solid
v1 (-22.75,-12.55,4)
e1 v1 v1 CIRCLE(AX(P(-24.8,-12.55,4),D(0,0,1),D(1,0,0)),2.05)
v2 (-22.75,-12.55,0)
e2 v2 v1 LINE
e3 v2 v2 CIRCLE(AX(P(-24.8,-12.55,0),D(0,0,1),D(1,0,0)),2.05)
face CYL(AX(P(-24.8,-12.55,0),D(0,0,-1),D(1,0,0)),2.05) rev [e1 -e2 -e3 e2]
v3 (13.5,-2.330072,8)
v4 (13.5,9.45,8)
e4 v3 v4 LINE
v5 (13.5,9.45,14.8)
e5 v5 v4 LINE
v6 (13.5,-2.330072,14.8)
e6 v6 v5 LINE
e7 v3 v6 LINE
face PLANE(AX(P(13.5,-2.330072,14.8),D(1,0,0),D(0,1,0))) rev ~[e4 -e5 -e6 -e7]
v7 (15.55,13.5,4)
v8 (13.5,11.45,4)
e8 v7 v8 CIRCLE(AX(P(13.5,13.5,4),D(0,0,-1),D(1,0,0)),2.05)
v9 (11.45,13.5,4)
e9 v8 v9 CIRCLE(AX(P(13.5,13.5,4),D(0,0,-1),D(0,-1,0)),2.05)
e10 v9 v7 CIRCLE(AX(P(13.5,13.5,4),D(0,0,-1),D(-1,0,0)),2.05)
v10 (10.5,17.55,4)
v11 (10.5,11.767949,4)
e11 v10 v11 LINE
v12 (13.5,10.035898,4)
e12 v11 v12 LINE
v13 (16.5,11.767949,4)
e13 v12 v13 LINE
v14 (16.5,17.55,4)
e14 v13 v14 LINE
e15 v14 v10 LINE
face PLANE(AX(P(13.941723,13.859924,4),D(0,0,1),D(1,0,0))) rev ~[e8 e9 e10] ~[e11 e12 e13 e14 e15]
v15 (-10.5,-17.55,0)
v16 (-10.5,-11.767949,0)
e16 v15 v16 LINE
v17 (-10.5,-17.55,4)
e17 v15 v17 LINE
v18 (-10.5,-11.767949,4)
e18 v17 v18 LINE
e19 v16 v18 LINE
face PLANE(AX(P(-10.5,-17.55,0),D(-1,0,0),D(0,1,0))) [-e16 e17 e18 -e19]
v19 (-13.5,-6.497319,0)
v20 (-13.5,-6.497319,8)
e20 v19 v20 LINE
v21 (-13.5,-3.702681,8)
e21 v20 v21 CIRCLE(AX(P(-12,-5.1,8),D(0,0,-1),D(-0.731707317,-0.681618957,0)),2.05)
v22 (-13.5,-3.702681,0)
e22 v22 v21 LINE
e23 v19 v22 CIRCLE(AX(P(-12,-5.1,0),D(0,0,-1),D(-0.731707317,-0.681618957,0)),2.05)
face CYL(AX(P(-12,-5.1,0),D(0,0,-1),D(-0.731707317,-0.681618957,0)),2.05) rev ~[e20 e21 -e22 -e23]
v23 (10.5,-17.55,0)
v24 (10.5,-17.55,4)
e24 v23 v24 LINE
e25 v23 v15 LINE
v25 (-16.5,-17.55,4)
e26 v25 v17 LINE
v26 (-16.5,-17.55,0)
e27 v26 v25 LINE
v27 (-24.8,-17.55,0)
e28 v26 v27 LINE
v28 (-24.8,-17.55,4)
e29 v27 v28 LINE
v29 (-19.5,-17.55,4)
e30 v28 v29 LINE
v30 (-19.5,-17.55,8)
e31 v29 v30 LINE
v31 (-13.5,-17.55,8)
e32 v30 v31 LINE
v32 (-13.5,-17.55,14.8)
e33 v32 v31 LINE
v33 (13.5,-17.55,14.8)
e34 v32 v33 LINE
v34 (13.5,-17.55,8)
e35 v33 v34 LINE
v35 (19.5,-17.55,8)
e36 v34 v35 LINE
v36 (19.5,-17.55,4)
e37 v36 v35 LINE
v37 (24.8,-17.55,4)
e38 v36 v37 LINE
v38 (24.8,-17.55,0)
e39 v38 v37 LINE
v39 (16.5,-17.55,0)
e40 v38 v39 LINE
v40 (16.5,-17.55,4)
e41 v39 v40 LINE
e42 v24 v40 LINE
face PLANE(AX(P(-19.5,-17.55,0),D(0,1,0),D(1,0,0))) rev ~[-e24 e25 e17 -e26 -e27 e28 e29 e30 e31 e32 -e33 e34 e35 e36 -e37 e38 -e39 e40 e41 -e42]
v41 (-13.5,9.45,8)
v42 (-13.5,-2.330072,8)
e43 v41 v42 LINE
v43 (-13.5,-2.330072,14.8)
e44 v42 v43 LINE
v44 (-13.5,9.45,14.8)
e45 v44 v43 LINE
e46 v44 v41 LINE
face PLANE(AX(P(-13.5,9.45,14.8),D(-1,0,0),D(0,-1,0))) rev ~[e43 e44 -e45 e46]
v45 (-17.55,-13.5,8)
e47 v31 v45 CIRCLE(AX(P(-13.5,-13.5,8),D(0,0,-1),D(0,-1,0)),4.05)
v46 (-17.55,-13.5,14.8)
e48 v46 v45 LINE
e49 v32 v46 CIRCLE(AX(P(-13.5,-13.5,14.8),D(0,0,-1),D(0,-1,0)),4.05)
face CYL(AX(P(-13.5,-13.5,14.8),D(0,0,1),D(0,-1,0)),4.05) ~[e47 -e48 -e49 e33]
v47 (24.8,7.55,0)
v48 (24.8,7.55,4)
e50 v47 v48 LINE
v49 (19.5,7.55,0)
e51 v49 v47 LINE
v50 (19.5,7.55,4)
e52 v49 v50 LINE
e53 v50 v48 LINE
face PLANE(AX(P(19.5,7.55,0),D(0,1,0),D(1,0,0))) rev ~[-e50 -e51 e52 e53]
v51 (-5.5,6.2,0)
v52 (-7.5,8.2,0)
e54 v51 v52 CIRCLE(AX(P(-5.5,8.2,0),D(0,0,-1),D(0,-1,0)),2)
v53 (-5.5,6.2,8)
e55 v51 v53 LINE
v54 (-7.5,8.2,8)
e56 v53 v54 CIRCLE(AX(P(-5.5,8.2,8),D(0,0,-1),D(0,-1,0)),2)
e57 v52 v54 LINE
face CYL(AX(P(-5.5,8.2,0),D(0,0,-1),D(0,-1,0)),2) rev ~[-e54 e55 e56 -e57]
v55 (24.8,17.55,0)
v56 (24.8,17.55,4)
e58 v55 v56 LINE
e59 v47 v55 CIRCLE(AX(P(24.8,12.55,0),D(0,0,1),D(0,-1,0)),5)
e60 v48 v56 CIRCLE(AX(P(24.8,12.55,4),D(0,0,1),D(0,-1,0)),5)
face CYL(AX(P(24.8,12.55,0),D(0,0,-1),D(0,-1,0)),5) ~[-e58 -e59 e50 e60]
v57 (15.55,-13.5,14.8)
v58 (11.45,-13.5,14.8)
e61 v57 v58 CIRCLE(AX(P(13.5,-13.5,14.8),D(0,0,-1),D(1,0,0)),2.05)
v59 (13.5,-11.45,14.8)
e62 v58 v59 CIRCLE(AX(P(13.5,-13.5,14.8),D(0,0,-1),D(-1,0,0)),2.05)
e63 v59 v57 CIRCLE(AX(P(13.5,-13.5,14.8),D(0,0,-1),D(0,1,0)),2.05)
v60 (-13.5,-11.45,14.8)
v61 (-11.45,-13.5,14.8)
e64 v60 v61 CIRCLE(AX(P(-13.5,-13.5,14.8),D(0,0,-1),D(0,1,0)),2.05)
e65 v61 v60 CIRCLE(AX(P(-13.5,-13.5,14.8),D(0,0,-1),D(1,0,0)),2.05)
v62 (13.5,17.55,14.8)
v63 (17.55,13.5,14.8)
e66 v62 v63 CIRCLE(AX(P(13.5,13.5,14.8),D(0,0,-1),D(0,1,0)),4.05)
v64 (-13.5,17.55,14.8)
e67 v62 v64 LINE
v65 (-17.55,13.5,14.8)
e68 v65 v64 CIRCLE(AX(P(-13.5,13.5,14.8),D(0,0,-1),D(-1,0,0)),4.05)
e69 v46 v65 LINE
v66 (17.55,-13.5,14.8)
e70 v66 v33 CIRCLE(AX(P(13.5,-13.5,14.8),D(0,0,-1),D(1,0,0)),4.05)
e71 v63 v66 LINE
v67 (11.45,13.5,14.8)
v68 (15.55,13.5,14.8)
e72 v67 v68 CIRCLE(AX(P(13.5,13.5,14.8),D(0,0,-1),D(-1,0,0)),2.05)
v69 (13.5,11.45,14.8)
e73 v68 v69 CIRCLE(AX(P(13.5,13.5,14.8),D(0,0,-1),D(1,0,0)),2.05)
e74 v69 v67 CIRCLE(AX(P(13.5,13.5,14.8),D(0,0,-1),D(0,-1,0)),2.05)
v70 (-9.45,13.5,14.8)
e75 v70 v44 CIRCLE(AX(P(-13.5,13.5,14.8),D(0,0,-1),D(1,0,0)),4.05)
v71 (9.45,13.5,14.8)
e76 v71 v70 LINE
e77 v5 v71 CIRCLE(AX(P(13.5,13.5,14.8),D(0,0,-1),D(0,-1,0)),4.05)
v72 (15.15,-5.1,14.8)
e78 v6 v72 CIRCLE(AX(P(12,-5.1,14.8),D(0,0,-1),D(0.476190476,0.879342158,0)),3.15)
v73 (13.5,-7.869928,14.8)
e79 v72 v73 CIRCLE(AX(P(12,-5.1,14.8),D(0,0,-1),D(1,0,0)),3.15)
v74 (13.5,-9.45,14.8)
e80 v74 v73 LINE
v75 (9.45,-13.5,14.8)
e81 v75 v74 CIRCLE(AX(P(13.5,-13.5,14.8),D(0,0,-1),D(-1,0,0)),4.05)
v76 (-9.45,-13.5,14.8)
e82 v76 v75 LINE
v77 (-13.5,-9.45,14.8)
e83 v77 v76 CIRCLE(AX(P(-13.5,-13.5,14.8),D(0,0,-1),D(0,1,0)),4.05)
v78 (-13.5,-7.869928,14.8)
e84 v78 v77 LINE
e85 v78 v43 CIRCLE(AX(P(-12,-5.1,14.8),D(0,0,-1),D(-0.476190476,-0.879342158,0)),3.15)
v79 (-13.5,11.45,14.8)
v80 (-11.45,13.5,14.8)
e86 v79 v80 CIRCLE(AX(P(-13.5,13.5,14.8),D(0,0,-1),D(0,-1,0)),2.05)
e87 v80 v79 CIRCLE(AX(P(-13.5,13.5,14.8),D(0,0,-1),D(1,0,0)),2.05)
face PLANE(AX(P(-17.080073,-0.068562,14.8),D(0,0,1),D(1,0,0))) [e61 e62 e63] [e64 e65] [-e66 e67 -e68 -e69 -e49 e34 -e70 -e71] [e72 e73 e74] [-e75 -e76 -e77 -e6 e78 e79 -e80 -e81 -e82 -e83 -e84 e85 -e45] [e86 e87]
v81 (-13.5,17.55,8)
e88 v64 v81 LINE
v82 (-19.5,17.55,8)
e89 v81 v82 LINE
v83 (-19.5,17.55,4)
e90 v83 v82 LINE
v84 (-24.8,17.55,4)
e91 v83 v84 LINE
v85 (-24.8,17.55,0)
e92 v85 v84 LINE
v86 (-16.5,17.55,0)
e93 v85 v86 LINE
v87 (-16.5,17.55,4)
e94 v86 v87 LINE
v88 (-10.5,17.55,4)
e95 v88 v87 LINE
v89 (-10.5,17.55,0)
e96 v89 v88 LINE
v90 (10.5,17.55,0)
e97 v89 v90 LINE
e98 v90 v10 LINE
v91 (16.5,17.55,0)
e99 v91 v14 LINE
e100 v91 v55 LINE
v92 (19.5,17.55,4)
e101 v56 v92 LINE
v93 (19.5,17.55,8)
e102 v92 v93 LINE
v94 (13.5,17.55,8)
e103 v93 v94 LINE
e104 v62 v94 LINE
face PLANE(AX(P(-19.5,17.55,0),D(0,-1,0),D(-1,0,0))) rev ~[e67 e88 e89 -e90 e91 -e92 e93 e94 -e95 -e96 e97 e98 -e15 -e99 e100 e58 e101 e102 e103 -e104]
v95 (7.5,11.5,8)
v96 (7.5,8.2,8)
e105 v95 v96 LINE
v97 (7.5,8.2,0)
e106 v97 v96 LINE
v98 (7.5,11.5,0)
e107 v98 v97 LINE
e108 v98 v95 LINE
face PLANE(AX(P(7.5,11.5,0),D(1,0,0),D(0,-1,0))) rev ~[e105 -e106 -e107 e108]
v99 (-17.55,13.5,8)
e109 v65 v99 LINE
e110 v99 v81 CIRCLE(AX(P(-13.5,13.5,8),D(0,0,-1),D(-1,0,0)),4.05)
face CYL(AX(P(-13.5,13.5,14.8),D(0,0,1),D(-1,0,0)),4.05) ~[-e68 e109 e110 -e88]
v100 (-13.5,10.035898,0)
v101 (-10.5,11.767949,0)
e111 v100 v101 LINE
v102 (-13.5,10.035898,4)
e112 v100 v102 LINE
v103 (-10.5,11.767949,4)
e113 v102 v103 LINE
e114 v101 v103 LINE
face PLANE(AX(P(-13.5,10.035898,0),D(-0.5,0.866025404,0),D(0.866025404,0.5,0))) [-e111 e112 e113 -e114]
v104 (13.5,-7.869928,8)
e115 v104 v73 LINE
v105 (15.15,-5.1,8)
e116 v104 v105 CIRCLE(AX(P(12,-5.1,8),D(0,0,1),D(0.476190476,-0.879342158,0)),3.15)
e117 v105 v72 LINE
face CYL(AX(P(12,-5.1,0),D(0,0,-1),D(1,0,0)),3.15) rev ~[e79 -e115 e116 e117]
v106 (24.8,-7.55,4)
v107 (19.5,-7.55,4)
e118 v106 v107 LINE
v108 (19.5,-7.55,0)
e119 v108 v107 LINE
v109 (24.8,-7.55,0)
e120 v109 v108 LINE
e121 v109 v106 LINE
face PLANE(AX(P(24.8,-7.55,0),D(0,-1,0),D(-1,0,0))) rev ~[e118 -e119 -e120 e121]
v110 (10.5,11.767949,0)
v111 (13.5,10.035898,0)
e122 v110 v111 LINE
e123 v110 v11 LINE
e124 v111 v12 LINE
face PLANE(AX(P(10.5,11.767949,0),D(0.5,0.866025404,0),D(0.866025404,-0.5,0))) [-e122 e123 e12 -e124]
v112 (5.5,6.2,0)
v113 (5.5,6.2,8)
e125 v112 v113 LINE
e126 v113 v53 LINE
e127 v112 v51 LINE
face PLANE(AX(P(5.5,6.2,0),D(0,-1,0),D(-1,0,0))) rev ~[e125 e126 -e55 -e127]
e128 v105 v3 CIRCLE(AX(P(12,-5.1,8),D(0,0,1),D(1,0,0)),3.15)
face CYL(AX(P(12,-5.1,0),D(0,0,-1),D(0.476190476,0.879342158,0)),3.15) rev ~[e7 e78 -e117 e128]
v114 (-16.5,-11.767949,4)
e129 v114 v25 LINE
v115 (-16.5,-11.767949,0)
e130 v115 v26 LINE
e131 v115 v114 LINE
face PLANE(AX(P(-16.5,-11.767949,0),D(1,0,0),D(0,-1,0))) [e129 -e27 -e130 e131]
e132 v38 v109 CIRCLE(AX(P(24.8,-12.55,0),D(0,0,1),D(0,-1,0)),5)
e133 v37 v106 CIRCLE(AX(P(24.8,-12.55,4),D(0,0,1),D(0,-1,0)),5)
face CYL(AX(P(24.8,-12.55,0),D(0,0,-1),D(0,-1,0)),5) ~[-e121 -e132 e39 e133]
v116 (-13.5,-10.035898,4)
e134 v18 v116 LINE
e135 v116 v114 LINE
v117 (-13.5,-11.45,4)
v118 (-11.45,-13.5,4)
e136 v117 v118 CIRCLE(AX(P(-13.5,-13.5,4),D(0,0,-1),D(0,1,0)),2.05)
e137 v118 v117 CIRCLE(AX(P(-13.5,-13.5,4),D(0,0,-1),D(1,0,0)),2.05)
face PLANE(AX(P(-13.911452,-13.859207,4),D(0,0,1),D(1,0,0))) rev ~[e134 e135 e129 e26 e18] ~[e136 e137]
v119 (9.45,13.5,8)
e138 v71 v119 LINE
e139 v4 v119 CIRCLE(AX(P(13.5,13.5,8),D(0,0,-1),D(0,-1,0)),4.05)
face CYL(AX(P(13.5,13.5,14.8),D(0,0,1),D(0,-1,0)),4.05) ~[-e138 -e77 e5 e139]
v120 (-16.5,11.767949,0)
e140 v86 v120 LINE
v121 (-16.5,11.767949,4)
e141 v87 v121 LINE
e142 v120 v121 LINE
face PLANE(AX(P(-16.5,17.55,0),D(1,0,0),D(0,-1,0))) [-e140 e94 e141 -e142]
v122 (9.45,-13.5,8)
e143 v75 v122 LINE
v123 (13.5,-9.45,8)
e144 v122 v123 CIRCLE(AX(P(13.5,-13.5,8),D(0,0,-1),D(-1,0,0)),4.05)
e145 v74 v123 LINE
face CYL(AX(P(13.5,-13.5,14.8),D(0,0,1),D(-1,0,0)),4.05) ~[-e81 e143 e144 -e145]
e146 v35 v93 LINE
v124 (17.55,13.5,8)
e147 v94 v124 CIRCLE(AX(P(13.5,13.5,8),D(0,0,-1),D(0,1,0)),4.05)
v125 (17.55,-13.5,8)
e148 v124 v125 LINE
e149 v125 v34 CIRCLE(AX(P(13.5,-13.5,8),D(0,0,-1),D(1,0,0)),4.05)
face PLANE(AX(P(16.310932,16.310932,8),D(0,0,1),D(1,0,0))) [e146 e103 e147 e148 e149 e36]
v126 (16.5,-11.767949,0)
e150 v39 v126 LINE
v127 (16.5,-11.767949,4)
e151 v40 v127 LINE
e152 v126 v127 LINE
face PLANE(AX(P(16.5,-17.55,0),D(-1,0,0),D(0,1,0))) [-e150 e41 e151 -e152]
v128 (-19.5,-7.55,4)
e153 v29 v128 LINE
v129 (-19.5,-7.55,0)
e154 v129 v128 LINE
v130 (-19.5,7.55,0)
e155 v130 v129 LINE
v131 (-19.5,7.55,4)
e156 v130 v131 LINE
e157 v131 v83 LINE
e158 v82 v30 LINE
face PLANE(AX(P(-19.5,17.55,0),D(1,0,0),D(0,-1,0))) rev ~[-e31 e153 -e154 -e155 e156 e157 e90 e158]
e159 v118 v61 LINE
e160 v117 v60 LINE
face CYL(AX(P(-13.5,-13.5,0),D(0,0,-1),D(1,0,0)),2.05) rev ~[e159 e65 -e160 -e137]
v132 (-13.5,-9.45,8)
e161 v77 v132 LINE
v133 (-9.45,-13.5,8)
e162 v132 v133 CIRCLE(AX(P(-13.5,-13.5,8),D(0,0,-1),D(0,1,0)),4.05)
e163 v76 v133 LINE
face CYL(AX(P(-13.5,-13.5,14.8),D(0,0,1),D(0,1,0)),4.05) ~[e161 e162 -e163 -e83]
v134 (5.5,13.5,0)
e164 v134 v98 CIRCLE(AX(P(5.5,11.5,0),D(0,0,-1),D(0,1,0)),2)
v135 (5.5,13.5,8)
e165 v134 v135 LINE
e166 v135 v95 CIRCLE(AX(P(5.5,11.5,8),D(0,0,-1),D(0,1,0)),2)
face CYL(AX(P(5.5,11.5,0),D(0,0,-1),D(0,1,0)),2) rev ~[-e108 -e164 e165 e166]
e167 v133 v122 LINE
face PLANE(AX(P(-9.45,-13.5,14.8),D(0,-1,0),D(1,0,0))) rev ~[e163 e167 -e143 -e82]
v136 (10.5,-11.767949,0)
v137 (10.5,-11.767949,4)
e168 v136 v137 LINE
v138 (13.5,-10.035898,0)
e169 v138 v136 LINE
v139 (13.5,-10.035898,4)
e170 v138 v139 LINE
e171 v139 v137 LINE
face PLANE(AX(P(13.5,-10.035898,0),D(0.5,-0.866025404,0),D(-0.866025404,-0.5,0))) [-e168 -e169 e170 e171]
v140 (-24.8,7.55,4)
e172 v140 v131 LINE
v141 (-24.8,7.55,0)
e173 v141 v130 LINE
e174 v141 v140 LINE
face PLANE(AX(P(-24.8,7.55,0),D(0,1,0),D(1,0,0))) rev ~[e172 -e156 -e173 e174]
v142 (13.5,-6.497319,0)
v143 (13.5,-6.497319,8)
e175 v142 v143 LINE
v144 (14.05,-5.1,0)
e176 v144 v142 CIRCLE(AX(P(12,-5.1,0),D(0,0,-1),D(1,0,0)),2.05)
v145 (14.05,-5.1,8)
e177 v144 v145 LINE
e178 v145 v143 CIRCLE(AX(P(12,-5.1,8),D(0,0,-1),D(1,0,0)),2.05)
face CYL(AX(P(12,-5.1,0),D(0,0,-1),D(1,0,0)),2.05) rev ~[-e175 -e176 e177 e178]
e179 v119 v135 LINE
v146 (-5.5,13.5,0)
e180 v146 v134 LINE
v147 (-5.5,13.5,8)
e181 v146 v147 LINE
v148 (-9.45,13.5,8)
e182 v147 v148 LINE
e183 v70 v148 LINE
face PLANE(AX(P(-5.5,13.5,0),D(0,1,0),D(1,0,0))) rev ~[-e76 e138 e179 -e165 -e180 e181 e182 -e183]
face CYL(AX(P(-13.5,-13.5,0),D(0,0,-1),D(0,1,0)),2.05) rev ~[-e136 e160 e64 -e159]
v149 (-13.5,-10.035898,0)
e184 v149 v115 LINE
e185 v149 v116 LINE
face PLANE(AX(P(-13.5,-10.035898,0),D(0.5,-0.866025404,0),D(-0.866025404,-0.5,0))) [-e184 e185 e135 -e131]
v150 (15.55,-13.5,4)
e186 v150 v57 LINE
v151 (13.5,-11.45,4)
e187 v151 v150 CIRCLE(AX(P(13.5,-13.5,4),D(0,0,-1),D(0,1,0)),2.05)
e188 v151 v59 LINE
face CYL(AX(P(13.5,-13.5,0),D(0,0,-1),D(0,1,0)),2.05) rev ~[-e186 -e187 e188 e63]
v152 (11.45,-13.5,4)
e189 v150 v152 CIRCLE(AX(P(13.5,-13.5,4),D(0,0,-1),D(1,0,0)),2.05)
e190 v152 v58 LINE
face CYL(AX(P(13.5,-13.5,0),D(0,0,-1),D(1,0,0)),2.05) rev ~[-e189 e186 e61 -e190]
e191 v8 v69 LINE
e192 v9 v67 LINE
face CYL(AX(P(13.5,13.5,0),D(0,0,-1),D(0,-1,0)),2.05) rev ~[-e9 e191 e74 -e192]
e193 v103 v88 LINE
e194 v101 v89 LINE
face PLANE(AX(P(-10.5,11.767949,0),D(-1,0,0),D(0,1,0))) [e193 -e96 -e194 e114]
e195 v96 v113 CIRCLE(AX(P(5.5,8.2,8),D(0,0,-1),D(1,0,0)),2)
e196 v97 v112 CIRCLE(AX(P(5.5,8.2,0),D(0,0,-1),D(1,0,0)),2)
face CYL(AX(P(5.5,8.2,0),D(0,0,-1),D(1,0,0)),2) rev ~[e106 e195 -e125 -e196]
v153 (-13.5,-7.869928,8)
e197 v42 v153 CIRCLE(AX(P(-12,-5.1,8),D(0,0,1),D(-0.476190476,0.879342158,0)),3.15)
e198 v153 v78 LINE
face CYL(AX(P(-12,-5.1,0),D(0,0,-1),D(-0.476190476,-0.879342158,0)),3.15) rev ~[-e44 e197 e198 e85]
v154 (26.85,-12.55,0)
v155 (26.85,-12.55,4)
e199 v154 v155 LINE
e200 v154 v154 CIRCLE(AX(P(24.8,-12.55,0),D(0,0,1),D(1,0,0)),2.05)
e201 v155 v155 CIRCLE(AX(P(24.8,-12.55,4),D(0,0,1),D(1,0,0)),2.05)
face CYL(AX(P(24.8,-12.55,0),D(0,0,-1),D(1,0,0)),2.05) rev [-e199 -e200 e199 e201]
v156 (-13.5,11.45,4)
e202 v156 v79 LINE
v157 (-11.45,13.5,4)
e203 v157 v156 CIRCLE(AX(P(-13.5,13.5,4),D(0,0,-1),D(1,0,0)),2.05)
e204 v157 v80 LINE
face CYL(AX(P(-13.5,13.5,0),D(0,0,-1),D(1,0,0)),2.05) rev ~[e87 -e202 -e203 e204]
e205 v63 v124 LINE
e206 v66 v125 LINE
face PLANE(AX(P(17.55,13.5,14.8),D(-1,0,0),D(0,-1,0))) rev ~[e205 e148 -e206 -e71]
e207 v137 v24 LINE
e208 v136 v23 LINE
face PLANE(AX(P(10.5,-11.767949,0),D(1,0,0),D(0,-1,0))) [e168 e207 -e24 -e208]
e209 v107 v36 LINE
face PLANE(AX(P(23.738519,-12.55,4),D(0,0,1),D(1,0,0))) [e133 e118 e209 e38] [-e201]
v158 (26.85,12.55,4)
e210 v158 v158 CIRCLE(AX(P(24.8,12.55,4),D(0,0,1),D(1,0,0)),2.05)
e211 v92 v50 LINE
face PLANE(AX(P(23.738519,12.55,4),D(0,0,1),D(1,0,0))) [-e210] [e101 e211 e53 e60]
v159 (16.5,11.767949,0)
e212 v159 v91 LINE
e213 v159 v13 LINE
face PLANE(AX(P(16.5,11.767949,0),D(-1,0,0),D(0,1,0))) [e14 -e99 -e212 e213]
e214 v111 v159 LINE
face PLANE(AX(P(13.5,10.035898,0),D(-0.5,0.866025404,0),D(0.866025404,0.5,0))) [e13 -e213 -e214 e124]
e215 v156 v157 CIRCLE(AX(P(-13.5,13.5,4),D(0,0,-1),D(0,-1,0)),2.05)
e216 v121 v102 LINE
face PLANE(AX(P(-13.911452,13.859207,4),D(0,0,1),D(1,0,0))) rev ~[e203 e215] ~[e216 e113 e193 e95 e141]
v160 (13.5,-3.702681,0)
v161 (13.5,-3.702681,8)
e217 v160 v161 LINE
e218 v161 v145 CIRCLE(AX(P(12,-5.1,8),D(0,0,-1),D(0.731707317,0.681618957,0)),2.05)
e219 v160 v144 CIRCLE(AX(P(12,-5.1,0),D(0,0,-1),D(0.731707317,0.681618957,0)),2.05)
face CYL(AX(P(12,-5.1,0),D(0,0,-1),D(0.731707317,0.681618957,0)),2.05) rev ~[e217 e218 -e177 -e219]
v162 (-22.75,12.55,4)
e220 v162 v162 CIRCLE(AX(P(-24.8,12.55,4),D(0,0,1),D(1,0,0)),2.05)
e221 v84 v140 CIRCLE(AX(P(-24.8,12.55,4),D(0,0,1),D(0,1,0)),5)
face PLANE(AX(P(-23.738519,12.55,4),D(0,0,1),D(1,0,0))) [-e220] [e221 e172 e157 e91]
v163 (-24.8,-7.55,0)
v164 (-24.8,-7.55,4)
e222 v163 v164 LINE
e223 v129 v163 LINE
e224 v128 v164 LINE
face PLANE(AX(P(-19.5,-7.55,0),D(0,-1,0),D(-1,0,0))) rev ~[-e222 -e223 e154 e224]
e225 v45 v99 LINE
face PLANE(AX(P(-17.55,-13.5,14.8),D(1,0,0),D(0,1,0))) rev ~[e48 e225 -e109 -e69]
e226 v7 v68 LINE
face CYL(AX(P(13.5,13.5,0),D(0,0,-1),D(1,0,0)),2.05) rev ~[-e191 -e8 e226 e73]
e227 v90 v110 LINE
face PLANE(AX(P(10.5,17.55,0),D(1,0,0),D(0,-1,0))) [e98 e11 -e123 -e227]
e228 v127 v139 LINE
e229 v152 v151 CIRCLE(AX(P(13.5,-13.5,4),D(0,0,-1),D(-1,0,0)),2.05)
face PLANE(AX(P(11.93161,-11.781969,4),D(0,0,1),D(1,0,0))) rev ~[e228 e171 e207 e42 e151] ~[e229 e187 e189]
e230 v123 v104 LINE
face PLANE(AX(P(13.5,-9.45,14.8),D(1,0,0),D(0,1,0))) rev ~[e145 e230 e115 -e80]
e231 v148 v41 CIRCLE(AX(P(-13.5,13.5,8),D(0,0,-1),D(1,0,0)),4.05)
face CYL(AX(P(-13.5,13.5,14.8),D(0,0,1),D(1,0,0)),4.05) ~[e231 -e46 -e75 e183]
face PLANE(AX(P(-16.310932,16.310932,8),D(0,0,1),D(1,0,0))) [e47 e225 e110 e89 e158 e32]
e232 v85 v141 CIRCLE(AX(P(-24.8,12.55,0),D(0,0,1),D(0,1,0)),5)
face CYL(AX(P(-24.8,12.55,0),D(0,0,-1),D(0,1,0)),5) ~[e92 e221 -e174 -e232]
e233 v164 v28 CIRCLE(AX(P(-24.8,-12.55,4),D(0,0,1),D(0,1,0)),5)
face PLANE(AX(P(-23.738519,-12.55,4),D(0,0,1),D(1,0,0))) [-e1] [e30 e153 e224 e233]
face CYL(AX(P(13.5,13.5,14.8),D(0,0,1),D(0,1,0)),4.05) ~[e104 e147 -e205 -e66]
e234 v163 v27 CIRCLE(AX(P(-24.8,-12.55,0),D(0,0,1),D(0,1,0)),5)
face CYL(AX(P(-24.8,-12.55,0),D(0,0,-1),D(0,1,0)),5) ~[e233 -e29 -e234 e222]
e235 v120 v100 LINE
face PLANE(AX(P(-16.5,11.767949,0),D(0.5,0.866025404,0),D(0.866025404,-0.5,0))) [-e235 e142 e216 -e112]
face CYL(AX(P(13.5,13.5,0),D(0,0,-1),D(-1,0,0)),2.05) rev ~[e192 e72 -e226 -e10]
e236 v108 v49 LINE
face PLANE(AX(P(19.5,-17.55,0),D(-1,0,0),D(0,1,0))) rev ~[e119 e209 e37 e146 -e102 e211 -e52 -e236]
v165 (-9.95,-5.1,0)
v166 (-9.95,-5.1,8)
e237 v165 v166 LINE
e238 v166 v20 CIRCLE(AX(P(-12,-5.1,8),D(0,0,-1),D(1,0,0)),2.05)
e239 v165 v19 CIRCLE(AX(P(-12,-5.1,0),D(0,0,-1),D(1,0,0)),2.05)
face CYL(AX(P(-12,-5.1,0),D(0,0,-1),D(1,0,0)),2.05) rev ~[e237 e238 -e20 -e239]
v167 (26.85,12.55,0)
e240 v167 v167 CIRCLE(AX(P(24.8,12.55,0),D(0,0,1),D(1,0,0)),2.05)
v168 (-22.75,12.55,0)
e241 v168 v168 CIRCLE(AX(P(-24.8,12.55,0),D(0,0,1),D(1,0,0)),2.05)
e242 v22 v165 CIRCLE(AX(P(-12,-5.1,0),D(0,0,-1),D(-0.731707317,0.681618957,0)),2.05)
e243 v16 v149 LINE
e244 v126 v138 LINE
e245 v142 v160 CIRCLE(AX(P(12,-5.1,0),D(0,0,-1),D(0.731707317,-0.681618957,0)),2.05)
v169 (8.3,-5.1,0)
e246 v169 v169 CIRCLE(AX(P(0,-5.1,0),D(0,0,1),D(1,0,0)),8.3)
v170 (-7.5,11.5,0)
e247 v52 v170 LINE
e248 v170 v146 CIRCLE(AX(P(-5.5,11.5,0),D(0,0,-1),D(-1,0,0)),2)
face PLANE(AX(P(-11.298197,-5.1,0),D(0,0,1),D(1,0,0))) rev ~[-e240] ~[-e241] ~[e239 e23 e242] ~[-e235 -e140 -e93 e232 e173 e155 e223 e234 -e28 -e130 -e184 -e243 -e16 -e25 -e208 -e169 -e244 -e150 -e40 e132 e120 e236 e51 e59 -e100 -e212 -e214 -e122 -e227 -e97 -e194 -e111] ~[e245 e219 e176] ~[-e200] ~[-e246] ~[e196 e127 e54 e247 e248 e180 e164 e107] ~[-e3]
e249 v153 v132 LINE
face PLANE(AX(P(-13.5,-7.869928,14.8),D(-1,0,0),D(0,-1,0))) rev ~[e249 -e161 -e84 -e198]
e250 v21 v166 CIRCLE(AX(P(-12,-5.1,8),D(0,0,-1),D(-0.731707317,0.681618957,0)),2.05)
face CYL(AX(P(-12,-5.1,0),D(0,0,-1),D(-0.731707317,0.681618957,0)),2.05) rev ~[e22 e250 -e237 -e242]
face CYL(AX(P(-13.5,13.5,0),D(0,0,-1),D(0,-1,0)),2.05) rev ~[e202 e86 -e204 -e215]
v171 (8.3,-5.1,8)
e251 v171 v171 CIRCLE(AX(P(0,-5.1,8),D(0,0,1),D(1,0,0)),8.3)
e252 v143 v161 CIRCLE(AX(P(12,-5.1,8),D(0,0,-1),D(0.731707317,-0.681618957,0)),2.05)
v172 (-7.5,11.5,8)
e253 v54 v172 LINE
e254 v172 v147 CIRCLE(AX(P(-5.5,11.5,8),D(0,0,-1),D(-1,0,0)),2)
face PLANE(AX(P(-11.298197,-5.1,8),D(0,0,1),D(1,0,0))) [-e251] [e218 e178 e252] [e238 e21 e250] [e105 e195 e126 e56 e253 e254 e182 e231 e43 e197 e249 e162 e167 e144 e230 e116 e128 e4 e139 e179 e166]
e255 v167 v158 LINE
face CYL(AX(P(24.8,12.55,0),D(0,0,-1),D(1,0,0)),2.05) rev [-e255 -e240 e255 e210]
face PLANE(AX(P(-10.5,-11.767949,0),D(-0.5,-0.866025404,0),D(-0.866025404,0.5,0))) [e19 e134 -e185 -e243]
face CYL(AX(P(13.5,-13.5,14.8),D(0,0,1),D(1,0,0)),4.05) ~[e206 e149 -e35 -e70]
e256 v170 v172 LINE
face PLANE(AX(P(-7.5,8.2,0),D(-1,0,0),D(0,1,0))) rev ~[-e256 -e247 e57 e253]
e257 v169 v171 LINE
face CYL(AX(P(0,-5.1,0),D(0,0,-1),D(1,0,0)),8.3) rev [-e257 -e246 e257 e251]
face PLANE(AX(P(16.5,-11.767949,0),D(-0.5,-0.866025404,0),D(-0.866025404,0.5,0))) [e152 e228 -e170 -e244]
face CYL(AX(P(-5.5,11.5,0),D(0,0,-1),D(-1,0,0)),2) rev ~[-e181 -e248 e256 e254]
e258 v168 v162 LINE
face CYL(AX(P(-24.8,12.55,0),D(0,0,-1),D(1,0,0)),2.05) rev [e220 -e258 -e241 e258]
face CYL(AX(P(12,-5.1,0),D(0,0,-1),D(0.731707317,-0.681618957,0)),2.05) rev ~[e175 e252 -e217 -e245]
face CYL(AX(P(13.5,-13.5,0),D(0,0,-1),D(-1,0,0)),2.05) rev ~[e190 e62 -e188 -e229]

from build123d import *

# Parameters (mm, degrees)
F0_R     = 8.3
F1_DEPTH = 14.8
F0_R_2   = 2.05
F2_DEPTH = 4
F3_DEPTH = 4
F4_R     = 8.3
F5_DEPTH = 6.8
F6_DEPTH = 8


# Not quite as in the source:
# - a feature names something its author has since deleted; it is built from what else it names


with BuildPart() as f1:
    # F0 (on Top) → F1 (new body)
    with BuildSketch(Plane.XY):
        with BuildLine():
            Line((-16.5, 15.2320508076), (-16.5, 17.55))
            Line((-16.5, 17.55), (-17.55, 17.55))
            Line((-17.55, 17.55), (-19.5, 17.55))
            Line((-19.5, 17.55), (-19.5, 7.55))
            Line((-19.5, 7.55), (-19.5, -7.55))
            Line((-19.5, -7.55), (-19.5, -17.55))
            Line((-19.5, -17.55), (-17.55, -17.55))
            Line((-17.55, -17.55), (-16.5, -17.55))
            Line((-16.5, -17.55), (-16.5, -15.2320508076))
            Line((-16.5, -15.2320508076), (-16.5, -11.7679491924))
            Line((-16.5, -11.7679491924), (-13.5, -10.0358983849))
            Line((-13.5, -10.0358983849), (-13.5, -7.8699277969))
            ThreePointArc((-13.5, -7.8699277969), (-15.15, -5.1), (-13.5, -2.3300722031))
            Line((-13.5, -2.3300722031), (-13.5, 10.0358983849))
            Line((-13.5, 10.0358983849), (-16.5, 11.7679491924))
            Line((-16.5, 11.7679491924), (-16.5, 15.2320508076))
        make_face()
        with BuildLine():
            Line((10.5, 11.7679491924), (10.5, 13.5))
            Line((10.5, 13.5), (5.5, 13.5))
            ThreePointArc((5.5, 13.5), (6.9142135624, 12.9142135624), (7.5, 11.5))
            Line((7.5, 11.5), (7.5, 8.2))
            ThreePointArc((7.5, 8.2), (6.9142135624, 6.7857864376), (5.5, 6.2))
            Line((5.5, 6.2), (-5.5, 6.2))
            ThreePointArc((-5.5, 6.2), (-6.9142135624, 6.7857864376), (-7.5, 8.2))
            Line((-7.5, 8.2), (-7.5, 11.5))
            ThreePointArc((-7.5, 11.5), (-6.9142135624, 12.9142135624), (-5.5, 13.5))
            Line((-5.5, 13.5), (-10.5, 13.5))
            Line((-10.5, 13.5), (-10.5, 11.7679491924))
            Line((-10.5, 11.7679491924), (-13.5, 10.0358983849))
            Line((-13.5, 10.0358983849), (-13.5, -2.3300722031))
            ThreePointArc((-13.5, -2.3300722031), (-10.3879361055, -2.3937572171), (-8.85, -5.1))
            ThreePointArc((-8.85, -5.1), (-10.3879361055, -7.8062427829), (-13.5, -7.8699277969))
            Line((-13.5, -7.8699277969), (-13.5, -10.0358983849))
            Line((-13.5, -10.0358983849), (-10.5, -11.7679491924))
            Line((-10.5, -11.7679491924), (-10.5, -13.5))
            Line((-10.5, -13.5), (10.5, -13.5))
            Line((10.5, -13.5), (10.5, -11.7679491924))
            Line((10.5, -11.7679491924), (13.5, -10.0358983849))
            Line((13.5, -10.0358983849), (13.5, -7.8699277969))
            ThreePointArc((13.5, -7.8699277969), (8.85, -5.1), (13.5, -2.3300722031))
            Line((13.5, -2.3300722031), (13.5, 10.0358983849))
            Line((13.5, 10.0358983849), (10.5, 11.7679491924))
        make_face()
        with Locations((0, -5.1)):
            Circle(F0_R, mode=Mode.SUBTRACT)
        Polygon((10.5, 15.2320508076), (10.5, 17.55), (-10.5, 17.55), (-10.5, 15.2320508076), (-10.5, 13.5), (-5.5, 13.5), (5.5, 13.5), (10.5, 13.5), align=None)
        with BuildLine():
            Line((19.5, 17.55), (17.55, 17.55))
            Line((17.55, 17.55), (16.5, 17.55))
            Line((16.5, 17.55), (16.5, 15.2320508076))
            Line((16.5, 15.2320508076), (16.5, 11.7679491924))
            Line((16.5, 11.7679491924), (13.5, 10.0358983849))
            Line((13.5, 10.0358983849), (13.5, -2.3300722031))
            ThreePointArc((13.5, -2.3300722031), (14.7062427829, -3.4879361055), (15.15, -5.1))
            ThreePointArc((15.15, -5.1), (14.7062427829, -6.7120638945), (13.5, -7.8699277969))
            Line((13.5, -7.8699277969), (13.5, -10.0358983849))
            Line((13.5, -10.0358983849), (16.5, -11.7679491924))
            Line((16.5, -11.7679491924), (16.5, -15.2320508076))
            Line((16.5, -15.2320508076), (16.5, -17.55))
            Line((16.5, -17.55), (17.55, -17.55))
            Line((17.55, -17.55), (19.5, -17.55))
            Line((19.5, -17.55), (19.5, -7.55))
            Line((19.5, -7.55), (19.5, 7.55))
            Line((19.5, 7.55), (19.5, 17.55))
        make_face()
        Polygon((-10.5, -17.55), (10.5, -17.55), (10.5, -15.2320508076), (10.5, -13.5), (-10.5, -13.5), (-10.5, -15.2320508076), align=None)
        Polygon((-10.5, 15.2320508076), (-10.5, 17.55), (-16.5, 17.55), (-16.5, 15.2320508076), (-13.5, 16.9641016151), align=None)
        with BuildLine():
            Line((-10.5, 13.5), (-10.5, 15.2320508076))
            Line((-10.5, 15.2320508076), (-13.5, 16.9641016151))
            Line((-13.5, 16.9641016151), (-16.5, 15.2320508076))
            Line((-16.5, 15.2320508076), (-16.5, 11.7679491924))
            Line((-16.5, 11.7679491924), (-13.5, 10.0358983849))
            Line((-13.5, 10.0358983849), (-13.5, 11.45))
            ThreePointArc((-13.5, 11.45), (-14.9495689014, 14.9495689014), (-11.45, 13.5))
            Line((-11.45, 13.5), (-10.5, 13.5))
        make_face()
        Polygon((16.5, 15.2320508076), (16.5, 17.55), (10.5, 17.55), (10.5, 15.2320508076), (13.5, 16.9641016151), align=None)
        with BuildLine():
            Line((16.5, 11.7679491924), (16.5, 15.2320508076))
            Line((16.5, 15.2320508076), (13.5, 16.9641016151))
            Line((13.5, 16.9641016151), (10.5, 15.2320508076))
            Line((10.5, 15.2320508076), (10.5, 13.5))
            Line((10.5, 13.5), (11.45, 13.5))
            ThreePointArc((11.45, 13.5), (13.5, 15.55), (15.55, 13.5))
            ThreePointArc((15.55, 13.5), (14.9495689014, 12.0504310986), (13.5, 11.45))
            Line((13.5, 11.45), (13.5, 10.0358983849))
            Line((13.5, 10.0358983849), (16.5, 11.7679491924))
        make_face()
        with BuildLine():
            Line((11.45, 13.5), (10.5, 13.5))
            Line((10.5, 13.5), (10.5, 11.7679491924))
            Line((10.5, 11.7679491924), (13.5, 10.0358983849))
            Line((13.5, 10.0358983849), (13.5, 11.45))
            ThreePointArc((13.5, 11.45), (12.0504310986, 12.0504310986), (11.45, 13.5))
        make_face()
        with BuildLine():
            Line((-10.5, 11.7679491924), (-10.5, 13.5))
            Line((-10.5, 13.5), (-11.45, 13.5))
            ThreePointArc((-11.45, 13.5), (-12.0504310986, 12.0504310986), (-13.5, 11.45))
            Line((-13.5, 11.45), (-13.5, 10.0358983849))
            Line((-13.5, 10.0358983849), (-10.5, 11.7679491924))
        make_face()
        with BuildLine():
            Line((-10.5, -11.7679491924), (-13.5, -10.0358983849))
            Line((-13.5, -10.0358983849), (-13.5, -11.45))
            ThreePointArc((-13.5, -11.45), (-12.0504310986, -12.0504310986), (-11.45, -13.5))
            Line((-11.45, -13.5), (-10.5, -13.5))
            Line((-10.5, -13.5), (-10.5, -11.7679491924))
        make_face()
        with BuildLine():
            Line((-13.5, -16.9641016151), (-10.5, -15.2320508076))
            Line((-10.5, -15.2320508076), (-10.5, -13.5))
            Line((-10.5, -13.5), (-11.45, -13.5))
            ThreePointArc((-11.45, -13.5), (-14.9495689014, -14.9495689014), (-13.5, -11.45))
            Line((-13.5, -11.45), (-13.5, -10.0358983849))
            Line((-13.5, -10.0358983849), (-16.5, -11.7679491924))
            Line((-16.5, -11.7679491924), (-16.5, -15.2320508076))
            Line((-16.5, -15.2320508076), (-13.5, -16.9641016151))
        make_face()
        Polygon((-16.5, -17.55), (-10.5, -17.55), (-10.5, -15.2320508076), (-13.5, -16.9641016151), (-16.5, -15.2320508076), align=None)
        Polygon((10.5, -17.55), (16.5, -17.55), (16.5, -15.2320508076), (13.5, -16.9641016151), (10.5, -15.2320508076), align=None)
        with BuildLine():
            Line((16.5, -11.7679491924), (13.5, -10.0358983849))
            Line((13.5, -10.0358983849), (13.5, -11.45))
            ThreePointArc((13.5, -11.45), (14.9495689014, -12.0504310986), (15.55, -13.5))
            ThreePointArc((15.55, -13.5), (13.5, -15.55), (11.45, -13.5))
            Line((11.45, -13.5), (10.5, -13.5))
            Line((10.5, -13.5), (10.5, -15.2320508076))
            Line((10.5, -15.2320508076), (13.5, -16.9641016151))
            Line((13.5, -16.9641016151), (16.5, -15.2320508076))
            Line((16.5, -15.2320508076), (16.5, -11.7679491924))
        make_face()
        with BuildLine():
            Line((13.5, -11.45), (13.5, -10.0358983849))
            Line((13.5, -10.0358983849), (10.5, -11.7679491924))
            Line((10.5, -11.7679491924), (10.5, -13.5))
            Line((10.5, -13.5), (11.45, -13.5))
            ThreePointArc((11.45, -13.5), (12.0504310986, -12.0504310986), (13.5, -11.45))
        make_face()
    extrude(amount=F1_DEPTH)

    # F0 (on Top) → F2 (join)
    with BuildSketch(Plane.XY):
        with BuildLine():
            Line((-19.5, 7.55), (-19.5, 17.55))
            Line((-19.5, 17.55), (-24.8, 17.55))
            ThreePointArc((-24.8, 17.55), (-29.8, 12.55), (-24.8, 7.55))
            Line((-24.8, 7.55), (-19.5, 7.55))
        make_face()
        with Locations((-24.8, 12.55)):
            Circle(F0_R_2, mode=Mode.SUBTRACT)
        with BuildLine():
            Line((-19.5, -17.55), (-19.5, -7.55))
            Line((-19.5, -7.55), (-24.8, -7.55))
            ThreePointArc((-24.8, -7.55), (-29.8, -12.55), (-24.8, -17.55))
            Line((-24.8, -17.55), (-19.5, -17.55))
        make_face()
        with Locations((-24.8, -12.55)):
            Circle(F0_R_2, mode=Mode.SUBTRACT)
        with BuildLine():
            Line((24.8, -7.55), (19.5, -7.55))
            Line((19.5, -7.55), (19.5, -17.55))
            Line((19.5, -17.55), (24.8, -17.55))
            ThreePointArc((24.8, -17.55), (29.8, -12.55), (24.8, -7.55))
        make_face()
        with Locations((24.8, -12.55)):
            Circle(F0_R_2, mode=Mode.SUBTRACT)
        with BuildLine():
            Line((24.8, 17.55), (19.5, 17.55))
            Line((19.5, 17.55), (19.5, 7.55))
            Line((19.5, 7.55), (24.8, 7.55))
            ThreePointArc((24.8, 7.55), (29.8, 12.55), (24.8, 17.55))
        make_face()
        with Locations((24.8, 12.55)):
            Circle(F0_R_2, mode=Mode.SUBTRACT)
    extrude(amount=F2_DEPTH)

    # F0 (on Top) → F3 (cut)
    with BuildSketch(Plane.XY):
        with BuildLine():
            Line((16.5, 11.7679491924), (16.5, 15.2320508076))
            Line((16.5, 15.2320508076), (13.5, 16.9641016151))
            Line((13.5, 16.9641016151), (10.5, 15.2320508076))
            Line((10.5, 15.2320508076), (10.5, 13.5))
            Line((10.5, 13.5), (11.45, 13.5))
            ThreePointArc((11.45, 13.5), (13.5, 15.55), (15.55, 13.5))
            ThreePointArc((15.55, 13.5), (14.9495689014, 12.0504310986), (13.5, 11.45))
            Line((13.5, 11.45), (13.5, 10.0358983849))
            Line((13.5, 10.0358983849), (16.5, 11.7679491924))
        make_face()
        with BuildLine():
            Line((11.45, 13.5), (10.5, 13.5))
            Line((10.5, 13.5), (10.5, 11.7679491924))
            Line((10.5, 11.7679491924), (13.5, 10.0358983849))
            Line((13.5, 10.0358983849), (13.5, 11.45))
            ThreePointArc((13.5, 11.45), (12.0504310986, 12.0504310986), (11.45, 13.5))
        make_face()
        Polygon((16.5, 15.2320508076), (16.5, 17.55), (10.5, 17.55), (10.5, 15.2320508076), (13.5, 16.9641016151), align=None)
        with BuildLine():
            Line((-10.5, 13.5), (-10.5, 15.2320508076))
            Line((-10.5, 15.2320508076), (-13.5, 16.9641016151))
            Line((-13.5, 16.9641016151), (-16.5, 15.2320508076))
            Line((-16.5, 15.2320508076), (-16.5, 11.7679491924))
            Line((-16.5, 11.7679491924), (-13.5, 10.0358983849))
            Line((-13.5, 10.0358983849), (-13.5, 11.45))
            ThreePointArc((-13.5, 11.45), (-14.9495689014, 14.9495689014), (-11.45, 13.5))
            Line((-11.45, 13.5), (-10.5, 13.5))
        make_face()
        with BuildLine():
            Line((-10.5, 11.7679491924), (-10.5, 13.5))
            Line((-10.5, 13.5), (-11.45, 13.5))
            ThreePointArc((-11.45, 13.5), (-12.0504310986, 12.0504310986), (-13.5, 11.45))
            Line((-13.5, 11.45), (-13.5, 10.0358983849))
            Line((-13.5, 10.0358983849), (-10.5, 11.7679491924))
        make_face()
        Polygon((-10.5, 15.2320508076), (-10.5, 17.55), (-16.5, 17.55), (-16.5, 15.2320508076), (-13.5, 16.9641016151), align=None)
        with BuildLine():
            Line((13.5, -11.45), (13.5, -10.0358983849))
            Line((13.5, -10.0358983849), (10.5, -11.7679491924))
            Line((10.5, -11.7679491924), (10.5, -13.5))
            Line((10.5, -13.5), (11.45, -13.5))
            ThreePointArc((11.45, -13.5), (12.0504310986, -12.0504310986), (13.5, -11.45))
        make_face()
        with BuildLine():
            Line((16.5, -11.7679491924), (13.5, -10.0358983849))
            Line((13.5, -10.0358983849), (13.5, -11.45))
            ThreePointArc((13.5, -11.45), (14.9495689014, -12.0504310986), (15.55, -13.5))
            ThreePointArc((15.55, -13.5), (13.5, -15.55), (11.45, -13.5))
            Line((11.45, -13.5), (10.5, -13.5))
            Line((10.5, -13.5), (10.5, -15.2320508076))
            Line((10.5, -15.2320508076), (13.5, -16.9641016151))
            Line((13.5, -16.9641016151), (16.5, -15.2320508076))
            Line((16.5, -15.2320508076), (16.5, -11.7679491924))
        make_face()
        Polygon((10.5, -17.55), (16.5, -17.55), (16.5, -15.2320508076), (13.5, -16.9641016151), (10.5, -15.2320508076), align=None)
        with BuildLine():
            Line((-13.5, -16.9641016151), (-10.5, -15.2320508076))
            Line((-10.5, -15.2320508076), (-10.5, -13.5))
            Line((-10.5, -13.5), (-11.45, -13.5))
            ThreePointArc((-11.45, -13.5), (-14.9495689014, -14.9495689014), (-13.5, -11.45))
            Line((-13.5, -11.45), (-13.5, -10.0358983849))
            Line((-13.5, -10.0358983849), (-16.5, -11.7679491924))
            Line((-16.5, -11.7679491924), (-16.5, -15.2320508076))
            Line((-16.5, -15.2320508076), (-13.5, -16.9641016151))
        make_face()
        with BuildLine():
            Line((-10.5, -11.7679491924), (-13.5, -10.0358983849))
            Line((-13.5, -10.0358983849), (-13.5, -11.45))
            ThreePointArc((-13.5, -11.45), (-12.0504310986, -12.0504310986), (-11.45, -13.5))
            Line((-11.45, -13.5), (-10.5, -13.5))
            Line((-10.5, -13.5), (-10.5, -11.7679491924))
        make_face()
        Polygon((-16.5, -17.55), (-10.5, -17.55), (-10.5, -15.2320508076), (-13.5, -16.9641016151), (-16.5, -15.2320508076), align=None)
    extrude(amount=F3_DEPTH, mode=Mode.SUBTRACT)

    # F4 (on face) → F5 (cut)
    with BuildSketch(Plane.XY.offset(14.8)):
        with BuildLine():
            ThreePointArc((13.5, 9.45), (10.6362175362, 10.6362175362), (9.45, 13.5))
            Line((9.45, 13.5), (5.5, 13.5))
            ThreePointArc((5.5, 13.5), (6.9142135624, 12.9142135624), (7.5, 11.5))
            Line((7.5, 11.5), (7.5, 8.2))
            ThreePointArc((7.5, 8.2), (6.9142135624, 6.7857864376), (5.5, 6.2))
            Line((5.5, 6.2), (-5.5, 6.2))
            ThreePointArc((-5.5, 6.2), (-6.9142135624, 6.7857864376), (-7.5, 8.2))
            Line((-7.5, 8.2), (-7.5, 11.5))
            ThreePointArc((-7.5, 11.5), (-6.9142135624, 12.9142135624), (-5.5, 13.5))
            Line((-5.5, 13.5), (-9.45, 13.5))
            ThreePointArc((-9.45, 13.5), (-10.6362175362, 10.6362175362), (-13.5, 9.45))
            Line((-13.5, 9.45), (-13.5, -2.3300722031))
            ThreePointArc((-13.5, -2.3300722031), (-10.3879361055, -2.3937572171), (-8.85, -5.1))
            ThreePointArc((-8.85, -5.1), (-10.3879361055, -7.8062427829), (-13.5, -7.8699277969))
            Line((-13.5, -7.8699277969), (-13.5, -9.45))
            ThreePointArc((-13.5, -9.45), (-10.6362175362, -10.6362175362), (-9.45, -13.5))
            Line((-9.45, -13.5), (9.45, -13.5))
            ThreePointArc((9.45, -13.5), (10.6362175362, -10.6362175362), (13.5, -9.45))
            Line((13.5, -9.45), (13.5, -7.8699277969))
            ThreePointArc((13.5, -7.8699277969), (8.85, -5.1), (13.5, -2.3300722031))
            Line((13.5, -2.3300722031), (13.5, 9.45))
        make_face()
        with Locations((0, -5.1)):
            Circle(F4_R, mode=Mode.SUBTRACT)
        with BuildLine():
            Line((17.55, 17.55), (13.5, 17.55))
            ThreePointArc((13.5, 17.55), (16.3637824638, 16.3637824638), (17.55, 13.5))
            Line((17.55, 13.5), (17.55, 17.55))
        make_face()
        Polygon((17.55, 17.55), (17.55, 13.5), (17.55, -13.5), (17.55, -17.55), (19.5, -17.55), (19.5, 17.55), align=None)
        with BuildLine():
            ThreePointArc((-17.55, 13.5), (-16.3637824658, 16.3637824618), (-13.5000000055, 17.55))
            Line((-13.5000000055, 17.55), (-17.55, 17.55))
            Line((-17.55, 17.55), (-17.55, 13.5))
        make_face()
        with BuildLine():
            Line((17.55, -17.55), (17.55, -13.5))
            ThreePointArc((17.55, -13.5), (16.3637824652, -16.3637824624), (13.500000004, -17.55))
            Line((13.500000004, -17.55), (17.55, -17.55))
        make_face()
        Polygon((-17.55, 13.5), (-17.55, 17.55), (-19.5, 17.55), (-19.5, -17.55), (-17.55, -17.55), (-17.55, -13.5), align=None)
        with BuildLine():
            ThreePointArc((-13.5, -17.55), (-16.3637824638, -16.3637824638), (-17.55, -13.5))
            Line((-17.55, -13.5), (-17.55, -17.55))
            Line((-17.55, -17.55), (-13.5, -17.55))
        make_face()
    extrude(amount=-F5_DEPTH, mode=Mode.SUBTRACT)

    # F0 (on Top) → F6 (join)
    with BuildSketch(Plane.XY):
        with BuildLine():
            ThreePointArc((-8.85, -5.1), (-10.3879361055, -2.3937572171), (-13.5, -2.3300722031))
            Line((-13.5, -2.3300722031), (-13.5, -3.7026811388))
            ThreePointArc((-13.5, -3.7026811388), (-11.2491671291, -3.1924492143), (-9.95, -5.1))
            ThreePointArc((-9.95, -5.1), (-11.2491671291, -7.0075507857), (-13.5, -6.4973188612))
            Line((-13.5, -6.4973188612), (-13.5, -7.8699277969))
            ThreePointArc((-13.5, -7.8699277969), (-10.3879361055, -7.8062427829), (-8.85, -5.1))
        make_face()
        with BuildLine():
            Line((-13.5, -3.7026811388), (-13.5, -2.3300722031))
            ThreePointArc((-13.5, -2.3300722031), (-15.15, -5.1), (-13.5, -7.8699277969))
            Line((-13.5, -7.8699277969), (-13.5, -6.4973188612))
            ThreePointArc((-13.5, -6.4973188612), (-14.05, -5.1), (-13.5, -3.7026811388))
        make_face()
        with BuildLine():
            Line((13.5, -3.7026811388), (13.5, -2.3300722031))
            ThreePointArc((13.5, -2.3300722031), (8.85, -5.1), (13.5, -7.8699277969))
            Line((13.5, -7.8699277969), (13.5, -6.4973188612))
            ThreePointArc((13.5, -6.4973188612), (9.95, -5.1), (13.5, -3.7026811388))
        make_face()
        with BuildLine():
            ThreePointArc((15.15, -5.1), (14.7062427829, -3.4879361055), (13.5, -2.3300722031))
            Line((13.5, -2.3300722031), (13.5, -3.7026811388))
            ThreePointArc((13.5, -3.7026811388), (13.9075507857, -4.3491671291), (14.05, -5.1))
            ThreePointArc((14.05, -5.1), (13.9075507857, -5.8508328709), (13.5, -6.4973188612))
            Line((13.5, -6.4973188612), (13.5, -7.8699277969))
            ThreePointArc((13.5, -7.8699277969), (14.7062427829, -6.7120638945), (15.15, -5.1))
        make_face()
    extrude(amount=F6_DEPTH)


solid = f1.part
